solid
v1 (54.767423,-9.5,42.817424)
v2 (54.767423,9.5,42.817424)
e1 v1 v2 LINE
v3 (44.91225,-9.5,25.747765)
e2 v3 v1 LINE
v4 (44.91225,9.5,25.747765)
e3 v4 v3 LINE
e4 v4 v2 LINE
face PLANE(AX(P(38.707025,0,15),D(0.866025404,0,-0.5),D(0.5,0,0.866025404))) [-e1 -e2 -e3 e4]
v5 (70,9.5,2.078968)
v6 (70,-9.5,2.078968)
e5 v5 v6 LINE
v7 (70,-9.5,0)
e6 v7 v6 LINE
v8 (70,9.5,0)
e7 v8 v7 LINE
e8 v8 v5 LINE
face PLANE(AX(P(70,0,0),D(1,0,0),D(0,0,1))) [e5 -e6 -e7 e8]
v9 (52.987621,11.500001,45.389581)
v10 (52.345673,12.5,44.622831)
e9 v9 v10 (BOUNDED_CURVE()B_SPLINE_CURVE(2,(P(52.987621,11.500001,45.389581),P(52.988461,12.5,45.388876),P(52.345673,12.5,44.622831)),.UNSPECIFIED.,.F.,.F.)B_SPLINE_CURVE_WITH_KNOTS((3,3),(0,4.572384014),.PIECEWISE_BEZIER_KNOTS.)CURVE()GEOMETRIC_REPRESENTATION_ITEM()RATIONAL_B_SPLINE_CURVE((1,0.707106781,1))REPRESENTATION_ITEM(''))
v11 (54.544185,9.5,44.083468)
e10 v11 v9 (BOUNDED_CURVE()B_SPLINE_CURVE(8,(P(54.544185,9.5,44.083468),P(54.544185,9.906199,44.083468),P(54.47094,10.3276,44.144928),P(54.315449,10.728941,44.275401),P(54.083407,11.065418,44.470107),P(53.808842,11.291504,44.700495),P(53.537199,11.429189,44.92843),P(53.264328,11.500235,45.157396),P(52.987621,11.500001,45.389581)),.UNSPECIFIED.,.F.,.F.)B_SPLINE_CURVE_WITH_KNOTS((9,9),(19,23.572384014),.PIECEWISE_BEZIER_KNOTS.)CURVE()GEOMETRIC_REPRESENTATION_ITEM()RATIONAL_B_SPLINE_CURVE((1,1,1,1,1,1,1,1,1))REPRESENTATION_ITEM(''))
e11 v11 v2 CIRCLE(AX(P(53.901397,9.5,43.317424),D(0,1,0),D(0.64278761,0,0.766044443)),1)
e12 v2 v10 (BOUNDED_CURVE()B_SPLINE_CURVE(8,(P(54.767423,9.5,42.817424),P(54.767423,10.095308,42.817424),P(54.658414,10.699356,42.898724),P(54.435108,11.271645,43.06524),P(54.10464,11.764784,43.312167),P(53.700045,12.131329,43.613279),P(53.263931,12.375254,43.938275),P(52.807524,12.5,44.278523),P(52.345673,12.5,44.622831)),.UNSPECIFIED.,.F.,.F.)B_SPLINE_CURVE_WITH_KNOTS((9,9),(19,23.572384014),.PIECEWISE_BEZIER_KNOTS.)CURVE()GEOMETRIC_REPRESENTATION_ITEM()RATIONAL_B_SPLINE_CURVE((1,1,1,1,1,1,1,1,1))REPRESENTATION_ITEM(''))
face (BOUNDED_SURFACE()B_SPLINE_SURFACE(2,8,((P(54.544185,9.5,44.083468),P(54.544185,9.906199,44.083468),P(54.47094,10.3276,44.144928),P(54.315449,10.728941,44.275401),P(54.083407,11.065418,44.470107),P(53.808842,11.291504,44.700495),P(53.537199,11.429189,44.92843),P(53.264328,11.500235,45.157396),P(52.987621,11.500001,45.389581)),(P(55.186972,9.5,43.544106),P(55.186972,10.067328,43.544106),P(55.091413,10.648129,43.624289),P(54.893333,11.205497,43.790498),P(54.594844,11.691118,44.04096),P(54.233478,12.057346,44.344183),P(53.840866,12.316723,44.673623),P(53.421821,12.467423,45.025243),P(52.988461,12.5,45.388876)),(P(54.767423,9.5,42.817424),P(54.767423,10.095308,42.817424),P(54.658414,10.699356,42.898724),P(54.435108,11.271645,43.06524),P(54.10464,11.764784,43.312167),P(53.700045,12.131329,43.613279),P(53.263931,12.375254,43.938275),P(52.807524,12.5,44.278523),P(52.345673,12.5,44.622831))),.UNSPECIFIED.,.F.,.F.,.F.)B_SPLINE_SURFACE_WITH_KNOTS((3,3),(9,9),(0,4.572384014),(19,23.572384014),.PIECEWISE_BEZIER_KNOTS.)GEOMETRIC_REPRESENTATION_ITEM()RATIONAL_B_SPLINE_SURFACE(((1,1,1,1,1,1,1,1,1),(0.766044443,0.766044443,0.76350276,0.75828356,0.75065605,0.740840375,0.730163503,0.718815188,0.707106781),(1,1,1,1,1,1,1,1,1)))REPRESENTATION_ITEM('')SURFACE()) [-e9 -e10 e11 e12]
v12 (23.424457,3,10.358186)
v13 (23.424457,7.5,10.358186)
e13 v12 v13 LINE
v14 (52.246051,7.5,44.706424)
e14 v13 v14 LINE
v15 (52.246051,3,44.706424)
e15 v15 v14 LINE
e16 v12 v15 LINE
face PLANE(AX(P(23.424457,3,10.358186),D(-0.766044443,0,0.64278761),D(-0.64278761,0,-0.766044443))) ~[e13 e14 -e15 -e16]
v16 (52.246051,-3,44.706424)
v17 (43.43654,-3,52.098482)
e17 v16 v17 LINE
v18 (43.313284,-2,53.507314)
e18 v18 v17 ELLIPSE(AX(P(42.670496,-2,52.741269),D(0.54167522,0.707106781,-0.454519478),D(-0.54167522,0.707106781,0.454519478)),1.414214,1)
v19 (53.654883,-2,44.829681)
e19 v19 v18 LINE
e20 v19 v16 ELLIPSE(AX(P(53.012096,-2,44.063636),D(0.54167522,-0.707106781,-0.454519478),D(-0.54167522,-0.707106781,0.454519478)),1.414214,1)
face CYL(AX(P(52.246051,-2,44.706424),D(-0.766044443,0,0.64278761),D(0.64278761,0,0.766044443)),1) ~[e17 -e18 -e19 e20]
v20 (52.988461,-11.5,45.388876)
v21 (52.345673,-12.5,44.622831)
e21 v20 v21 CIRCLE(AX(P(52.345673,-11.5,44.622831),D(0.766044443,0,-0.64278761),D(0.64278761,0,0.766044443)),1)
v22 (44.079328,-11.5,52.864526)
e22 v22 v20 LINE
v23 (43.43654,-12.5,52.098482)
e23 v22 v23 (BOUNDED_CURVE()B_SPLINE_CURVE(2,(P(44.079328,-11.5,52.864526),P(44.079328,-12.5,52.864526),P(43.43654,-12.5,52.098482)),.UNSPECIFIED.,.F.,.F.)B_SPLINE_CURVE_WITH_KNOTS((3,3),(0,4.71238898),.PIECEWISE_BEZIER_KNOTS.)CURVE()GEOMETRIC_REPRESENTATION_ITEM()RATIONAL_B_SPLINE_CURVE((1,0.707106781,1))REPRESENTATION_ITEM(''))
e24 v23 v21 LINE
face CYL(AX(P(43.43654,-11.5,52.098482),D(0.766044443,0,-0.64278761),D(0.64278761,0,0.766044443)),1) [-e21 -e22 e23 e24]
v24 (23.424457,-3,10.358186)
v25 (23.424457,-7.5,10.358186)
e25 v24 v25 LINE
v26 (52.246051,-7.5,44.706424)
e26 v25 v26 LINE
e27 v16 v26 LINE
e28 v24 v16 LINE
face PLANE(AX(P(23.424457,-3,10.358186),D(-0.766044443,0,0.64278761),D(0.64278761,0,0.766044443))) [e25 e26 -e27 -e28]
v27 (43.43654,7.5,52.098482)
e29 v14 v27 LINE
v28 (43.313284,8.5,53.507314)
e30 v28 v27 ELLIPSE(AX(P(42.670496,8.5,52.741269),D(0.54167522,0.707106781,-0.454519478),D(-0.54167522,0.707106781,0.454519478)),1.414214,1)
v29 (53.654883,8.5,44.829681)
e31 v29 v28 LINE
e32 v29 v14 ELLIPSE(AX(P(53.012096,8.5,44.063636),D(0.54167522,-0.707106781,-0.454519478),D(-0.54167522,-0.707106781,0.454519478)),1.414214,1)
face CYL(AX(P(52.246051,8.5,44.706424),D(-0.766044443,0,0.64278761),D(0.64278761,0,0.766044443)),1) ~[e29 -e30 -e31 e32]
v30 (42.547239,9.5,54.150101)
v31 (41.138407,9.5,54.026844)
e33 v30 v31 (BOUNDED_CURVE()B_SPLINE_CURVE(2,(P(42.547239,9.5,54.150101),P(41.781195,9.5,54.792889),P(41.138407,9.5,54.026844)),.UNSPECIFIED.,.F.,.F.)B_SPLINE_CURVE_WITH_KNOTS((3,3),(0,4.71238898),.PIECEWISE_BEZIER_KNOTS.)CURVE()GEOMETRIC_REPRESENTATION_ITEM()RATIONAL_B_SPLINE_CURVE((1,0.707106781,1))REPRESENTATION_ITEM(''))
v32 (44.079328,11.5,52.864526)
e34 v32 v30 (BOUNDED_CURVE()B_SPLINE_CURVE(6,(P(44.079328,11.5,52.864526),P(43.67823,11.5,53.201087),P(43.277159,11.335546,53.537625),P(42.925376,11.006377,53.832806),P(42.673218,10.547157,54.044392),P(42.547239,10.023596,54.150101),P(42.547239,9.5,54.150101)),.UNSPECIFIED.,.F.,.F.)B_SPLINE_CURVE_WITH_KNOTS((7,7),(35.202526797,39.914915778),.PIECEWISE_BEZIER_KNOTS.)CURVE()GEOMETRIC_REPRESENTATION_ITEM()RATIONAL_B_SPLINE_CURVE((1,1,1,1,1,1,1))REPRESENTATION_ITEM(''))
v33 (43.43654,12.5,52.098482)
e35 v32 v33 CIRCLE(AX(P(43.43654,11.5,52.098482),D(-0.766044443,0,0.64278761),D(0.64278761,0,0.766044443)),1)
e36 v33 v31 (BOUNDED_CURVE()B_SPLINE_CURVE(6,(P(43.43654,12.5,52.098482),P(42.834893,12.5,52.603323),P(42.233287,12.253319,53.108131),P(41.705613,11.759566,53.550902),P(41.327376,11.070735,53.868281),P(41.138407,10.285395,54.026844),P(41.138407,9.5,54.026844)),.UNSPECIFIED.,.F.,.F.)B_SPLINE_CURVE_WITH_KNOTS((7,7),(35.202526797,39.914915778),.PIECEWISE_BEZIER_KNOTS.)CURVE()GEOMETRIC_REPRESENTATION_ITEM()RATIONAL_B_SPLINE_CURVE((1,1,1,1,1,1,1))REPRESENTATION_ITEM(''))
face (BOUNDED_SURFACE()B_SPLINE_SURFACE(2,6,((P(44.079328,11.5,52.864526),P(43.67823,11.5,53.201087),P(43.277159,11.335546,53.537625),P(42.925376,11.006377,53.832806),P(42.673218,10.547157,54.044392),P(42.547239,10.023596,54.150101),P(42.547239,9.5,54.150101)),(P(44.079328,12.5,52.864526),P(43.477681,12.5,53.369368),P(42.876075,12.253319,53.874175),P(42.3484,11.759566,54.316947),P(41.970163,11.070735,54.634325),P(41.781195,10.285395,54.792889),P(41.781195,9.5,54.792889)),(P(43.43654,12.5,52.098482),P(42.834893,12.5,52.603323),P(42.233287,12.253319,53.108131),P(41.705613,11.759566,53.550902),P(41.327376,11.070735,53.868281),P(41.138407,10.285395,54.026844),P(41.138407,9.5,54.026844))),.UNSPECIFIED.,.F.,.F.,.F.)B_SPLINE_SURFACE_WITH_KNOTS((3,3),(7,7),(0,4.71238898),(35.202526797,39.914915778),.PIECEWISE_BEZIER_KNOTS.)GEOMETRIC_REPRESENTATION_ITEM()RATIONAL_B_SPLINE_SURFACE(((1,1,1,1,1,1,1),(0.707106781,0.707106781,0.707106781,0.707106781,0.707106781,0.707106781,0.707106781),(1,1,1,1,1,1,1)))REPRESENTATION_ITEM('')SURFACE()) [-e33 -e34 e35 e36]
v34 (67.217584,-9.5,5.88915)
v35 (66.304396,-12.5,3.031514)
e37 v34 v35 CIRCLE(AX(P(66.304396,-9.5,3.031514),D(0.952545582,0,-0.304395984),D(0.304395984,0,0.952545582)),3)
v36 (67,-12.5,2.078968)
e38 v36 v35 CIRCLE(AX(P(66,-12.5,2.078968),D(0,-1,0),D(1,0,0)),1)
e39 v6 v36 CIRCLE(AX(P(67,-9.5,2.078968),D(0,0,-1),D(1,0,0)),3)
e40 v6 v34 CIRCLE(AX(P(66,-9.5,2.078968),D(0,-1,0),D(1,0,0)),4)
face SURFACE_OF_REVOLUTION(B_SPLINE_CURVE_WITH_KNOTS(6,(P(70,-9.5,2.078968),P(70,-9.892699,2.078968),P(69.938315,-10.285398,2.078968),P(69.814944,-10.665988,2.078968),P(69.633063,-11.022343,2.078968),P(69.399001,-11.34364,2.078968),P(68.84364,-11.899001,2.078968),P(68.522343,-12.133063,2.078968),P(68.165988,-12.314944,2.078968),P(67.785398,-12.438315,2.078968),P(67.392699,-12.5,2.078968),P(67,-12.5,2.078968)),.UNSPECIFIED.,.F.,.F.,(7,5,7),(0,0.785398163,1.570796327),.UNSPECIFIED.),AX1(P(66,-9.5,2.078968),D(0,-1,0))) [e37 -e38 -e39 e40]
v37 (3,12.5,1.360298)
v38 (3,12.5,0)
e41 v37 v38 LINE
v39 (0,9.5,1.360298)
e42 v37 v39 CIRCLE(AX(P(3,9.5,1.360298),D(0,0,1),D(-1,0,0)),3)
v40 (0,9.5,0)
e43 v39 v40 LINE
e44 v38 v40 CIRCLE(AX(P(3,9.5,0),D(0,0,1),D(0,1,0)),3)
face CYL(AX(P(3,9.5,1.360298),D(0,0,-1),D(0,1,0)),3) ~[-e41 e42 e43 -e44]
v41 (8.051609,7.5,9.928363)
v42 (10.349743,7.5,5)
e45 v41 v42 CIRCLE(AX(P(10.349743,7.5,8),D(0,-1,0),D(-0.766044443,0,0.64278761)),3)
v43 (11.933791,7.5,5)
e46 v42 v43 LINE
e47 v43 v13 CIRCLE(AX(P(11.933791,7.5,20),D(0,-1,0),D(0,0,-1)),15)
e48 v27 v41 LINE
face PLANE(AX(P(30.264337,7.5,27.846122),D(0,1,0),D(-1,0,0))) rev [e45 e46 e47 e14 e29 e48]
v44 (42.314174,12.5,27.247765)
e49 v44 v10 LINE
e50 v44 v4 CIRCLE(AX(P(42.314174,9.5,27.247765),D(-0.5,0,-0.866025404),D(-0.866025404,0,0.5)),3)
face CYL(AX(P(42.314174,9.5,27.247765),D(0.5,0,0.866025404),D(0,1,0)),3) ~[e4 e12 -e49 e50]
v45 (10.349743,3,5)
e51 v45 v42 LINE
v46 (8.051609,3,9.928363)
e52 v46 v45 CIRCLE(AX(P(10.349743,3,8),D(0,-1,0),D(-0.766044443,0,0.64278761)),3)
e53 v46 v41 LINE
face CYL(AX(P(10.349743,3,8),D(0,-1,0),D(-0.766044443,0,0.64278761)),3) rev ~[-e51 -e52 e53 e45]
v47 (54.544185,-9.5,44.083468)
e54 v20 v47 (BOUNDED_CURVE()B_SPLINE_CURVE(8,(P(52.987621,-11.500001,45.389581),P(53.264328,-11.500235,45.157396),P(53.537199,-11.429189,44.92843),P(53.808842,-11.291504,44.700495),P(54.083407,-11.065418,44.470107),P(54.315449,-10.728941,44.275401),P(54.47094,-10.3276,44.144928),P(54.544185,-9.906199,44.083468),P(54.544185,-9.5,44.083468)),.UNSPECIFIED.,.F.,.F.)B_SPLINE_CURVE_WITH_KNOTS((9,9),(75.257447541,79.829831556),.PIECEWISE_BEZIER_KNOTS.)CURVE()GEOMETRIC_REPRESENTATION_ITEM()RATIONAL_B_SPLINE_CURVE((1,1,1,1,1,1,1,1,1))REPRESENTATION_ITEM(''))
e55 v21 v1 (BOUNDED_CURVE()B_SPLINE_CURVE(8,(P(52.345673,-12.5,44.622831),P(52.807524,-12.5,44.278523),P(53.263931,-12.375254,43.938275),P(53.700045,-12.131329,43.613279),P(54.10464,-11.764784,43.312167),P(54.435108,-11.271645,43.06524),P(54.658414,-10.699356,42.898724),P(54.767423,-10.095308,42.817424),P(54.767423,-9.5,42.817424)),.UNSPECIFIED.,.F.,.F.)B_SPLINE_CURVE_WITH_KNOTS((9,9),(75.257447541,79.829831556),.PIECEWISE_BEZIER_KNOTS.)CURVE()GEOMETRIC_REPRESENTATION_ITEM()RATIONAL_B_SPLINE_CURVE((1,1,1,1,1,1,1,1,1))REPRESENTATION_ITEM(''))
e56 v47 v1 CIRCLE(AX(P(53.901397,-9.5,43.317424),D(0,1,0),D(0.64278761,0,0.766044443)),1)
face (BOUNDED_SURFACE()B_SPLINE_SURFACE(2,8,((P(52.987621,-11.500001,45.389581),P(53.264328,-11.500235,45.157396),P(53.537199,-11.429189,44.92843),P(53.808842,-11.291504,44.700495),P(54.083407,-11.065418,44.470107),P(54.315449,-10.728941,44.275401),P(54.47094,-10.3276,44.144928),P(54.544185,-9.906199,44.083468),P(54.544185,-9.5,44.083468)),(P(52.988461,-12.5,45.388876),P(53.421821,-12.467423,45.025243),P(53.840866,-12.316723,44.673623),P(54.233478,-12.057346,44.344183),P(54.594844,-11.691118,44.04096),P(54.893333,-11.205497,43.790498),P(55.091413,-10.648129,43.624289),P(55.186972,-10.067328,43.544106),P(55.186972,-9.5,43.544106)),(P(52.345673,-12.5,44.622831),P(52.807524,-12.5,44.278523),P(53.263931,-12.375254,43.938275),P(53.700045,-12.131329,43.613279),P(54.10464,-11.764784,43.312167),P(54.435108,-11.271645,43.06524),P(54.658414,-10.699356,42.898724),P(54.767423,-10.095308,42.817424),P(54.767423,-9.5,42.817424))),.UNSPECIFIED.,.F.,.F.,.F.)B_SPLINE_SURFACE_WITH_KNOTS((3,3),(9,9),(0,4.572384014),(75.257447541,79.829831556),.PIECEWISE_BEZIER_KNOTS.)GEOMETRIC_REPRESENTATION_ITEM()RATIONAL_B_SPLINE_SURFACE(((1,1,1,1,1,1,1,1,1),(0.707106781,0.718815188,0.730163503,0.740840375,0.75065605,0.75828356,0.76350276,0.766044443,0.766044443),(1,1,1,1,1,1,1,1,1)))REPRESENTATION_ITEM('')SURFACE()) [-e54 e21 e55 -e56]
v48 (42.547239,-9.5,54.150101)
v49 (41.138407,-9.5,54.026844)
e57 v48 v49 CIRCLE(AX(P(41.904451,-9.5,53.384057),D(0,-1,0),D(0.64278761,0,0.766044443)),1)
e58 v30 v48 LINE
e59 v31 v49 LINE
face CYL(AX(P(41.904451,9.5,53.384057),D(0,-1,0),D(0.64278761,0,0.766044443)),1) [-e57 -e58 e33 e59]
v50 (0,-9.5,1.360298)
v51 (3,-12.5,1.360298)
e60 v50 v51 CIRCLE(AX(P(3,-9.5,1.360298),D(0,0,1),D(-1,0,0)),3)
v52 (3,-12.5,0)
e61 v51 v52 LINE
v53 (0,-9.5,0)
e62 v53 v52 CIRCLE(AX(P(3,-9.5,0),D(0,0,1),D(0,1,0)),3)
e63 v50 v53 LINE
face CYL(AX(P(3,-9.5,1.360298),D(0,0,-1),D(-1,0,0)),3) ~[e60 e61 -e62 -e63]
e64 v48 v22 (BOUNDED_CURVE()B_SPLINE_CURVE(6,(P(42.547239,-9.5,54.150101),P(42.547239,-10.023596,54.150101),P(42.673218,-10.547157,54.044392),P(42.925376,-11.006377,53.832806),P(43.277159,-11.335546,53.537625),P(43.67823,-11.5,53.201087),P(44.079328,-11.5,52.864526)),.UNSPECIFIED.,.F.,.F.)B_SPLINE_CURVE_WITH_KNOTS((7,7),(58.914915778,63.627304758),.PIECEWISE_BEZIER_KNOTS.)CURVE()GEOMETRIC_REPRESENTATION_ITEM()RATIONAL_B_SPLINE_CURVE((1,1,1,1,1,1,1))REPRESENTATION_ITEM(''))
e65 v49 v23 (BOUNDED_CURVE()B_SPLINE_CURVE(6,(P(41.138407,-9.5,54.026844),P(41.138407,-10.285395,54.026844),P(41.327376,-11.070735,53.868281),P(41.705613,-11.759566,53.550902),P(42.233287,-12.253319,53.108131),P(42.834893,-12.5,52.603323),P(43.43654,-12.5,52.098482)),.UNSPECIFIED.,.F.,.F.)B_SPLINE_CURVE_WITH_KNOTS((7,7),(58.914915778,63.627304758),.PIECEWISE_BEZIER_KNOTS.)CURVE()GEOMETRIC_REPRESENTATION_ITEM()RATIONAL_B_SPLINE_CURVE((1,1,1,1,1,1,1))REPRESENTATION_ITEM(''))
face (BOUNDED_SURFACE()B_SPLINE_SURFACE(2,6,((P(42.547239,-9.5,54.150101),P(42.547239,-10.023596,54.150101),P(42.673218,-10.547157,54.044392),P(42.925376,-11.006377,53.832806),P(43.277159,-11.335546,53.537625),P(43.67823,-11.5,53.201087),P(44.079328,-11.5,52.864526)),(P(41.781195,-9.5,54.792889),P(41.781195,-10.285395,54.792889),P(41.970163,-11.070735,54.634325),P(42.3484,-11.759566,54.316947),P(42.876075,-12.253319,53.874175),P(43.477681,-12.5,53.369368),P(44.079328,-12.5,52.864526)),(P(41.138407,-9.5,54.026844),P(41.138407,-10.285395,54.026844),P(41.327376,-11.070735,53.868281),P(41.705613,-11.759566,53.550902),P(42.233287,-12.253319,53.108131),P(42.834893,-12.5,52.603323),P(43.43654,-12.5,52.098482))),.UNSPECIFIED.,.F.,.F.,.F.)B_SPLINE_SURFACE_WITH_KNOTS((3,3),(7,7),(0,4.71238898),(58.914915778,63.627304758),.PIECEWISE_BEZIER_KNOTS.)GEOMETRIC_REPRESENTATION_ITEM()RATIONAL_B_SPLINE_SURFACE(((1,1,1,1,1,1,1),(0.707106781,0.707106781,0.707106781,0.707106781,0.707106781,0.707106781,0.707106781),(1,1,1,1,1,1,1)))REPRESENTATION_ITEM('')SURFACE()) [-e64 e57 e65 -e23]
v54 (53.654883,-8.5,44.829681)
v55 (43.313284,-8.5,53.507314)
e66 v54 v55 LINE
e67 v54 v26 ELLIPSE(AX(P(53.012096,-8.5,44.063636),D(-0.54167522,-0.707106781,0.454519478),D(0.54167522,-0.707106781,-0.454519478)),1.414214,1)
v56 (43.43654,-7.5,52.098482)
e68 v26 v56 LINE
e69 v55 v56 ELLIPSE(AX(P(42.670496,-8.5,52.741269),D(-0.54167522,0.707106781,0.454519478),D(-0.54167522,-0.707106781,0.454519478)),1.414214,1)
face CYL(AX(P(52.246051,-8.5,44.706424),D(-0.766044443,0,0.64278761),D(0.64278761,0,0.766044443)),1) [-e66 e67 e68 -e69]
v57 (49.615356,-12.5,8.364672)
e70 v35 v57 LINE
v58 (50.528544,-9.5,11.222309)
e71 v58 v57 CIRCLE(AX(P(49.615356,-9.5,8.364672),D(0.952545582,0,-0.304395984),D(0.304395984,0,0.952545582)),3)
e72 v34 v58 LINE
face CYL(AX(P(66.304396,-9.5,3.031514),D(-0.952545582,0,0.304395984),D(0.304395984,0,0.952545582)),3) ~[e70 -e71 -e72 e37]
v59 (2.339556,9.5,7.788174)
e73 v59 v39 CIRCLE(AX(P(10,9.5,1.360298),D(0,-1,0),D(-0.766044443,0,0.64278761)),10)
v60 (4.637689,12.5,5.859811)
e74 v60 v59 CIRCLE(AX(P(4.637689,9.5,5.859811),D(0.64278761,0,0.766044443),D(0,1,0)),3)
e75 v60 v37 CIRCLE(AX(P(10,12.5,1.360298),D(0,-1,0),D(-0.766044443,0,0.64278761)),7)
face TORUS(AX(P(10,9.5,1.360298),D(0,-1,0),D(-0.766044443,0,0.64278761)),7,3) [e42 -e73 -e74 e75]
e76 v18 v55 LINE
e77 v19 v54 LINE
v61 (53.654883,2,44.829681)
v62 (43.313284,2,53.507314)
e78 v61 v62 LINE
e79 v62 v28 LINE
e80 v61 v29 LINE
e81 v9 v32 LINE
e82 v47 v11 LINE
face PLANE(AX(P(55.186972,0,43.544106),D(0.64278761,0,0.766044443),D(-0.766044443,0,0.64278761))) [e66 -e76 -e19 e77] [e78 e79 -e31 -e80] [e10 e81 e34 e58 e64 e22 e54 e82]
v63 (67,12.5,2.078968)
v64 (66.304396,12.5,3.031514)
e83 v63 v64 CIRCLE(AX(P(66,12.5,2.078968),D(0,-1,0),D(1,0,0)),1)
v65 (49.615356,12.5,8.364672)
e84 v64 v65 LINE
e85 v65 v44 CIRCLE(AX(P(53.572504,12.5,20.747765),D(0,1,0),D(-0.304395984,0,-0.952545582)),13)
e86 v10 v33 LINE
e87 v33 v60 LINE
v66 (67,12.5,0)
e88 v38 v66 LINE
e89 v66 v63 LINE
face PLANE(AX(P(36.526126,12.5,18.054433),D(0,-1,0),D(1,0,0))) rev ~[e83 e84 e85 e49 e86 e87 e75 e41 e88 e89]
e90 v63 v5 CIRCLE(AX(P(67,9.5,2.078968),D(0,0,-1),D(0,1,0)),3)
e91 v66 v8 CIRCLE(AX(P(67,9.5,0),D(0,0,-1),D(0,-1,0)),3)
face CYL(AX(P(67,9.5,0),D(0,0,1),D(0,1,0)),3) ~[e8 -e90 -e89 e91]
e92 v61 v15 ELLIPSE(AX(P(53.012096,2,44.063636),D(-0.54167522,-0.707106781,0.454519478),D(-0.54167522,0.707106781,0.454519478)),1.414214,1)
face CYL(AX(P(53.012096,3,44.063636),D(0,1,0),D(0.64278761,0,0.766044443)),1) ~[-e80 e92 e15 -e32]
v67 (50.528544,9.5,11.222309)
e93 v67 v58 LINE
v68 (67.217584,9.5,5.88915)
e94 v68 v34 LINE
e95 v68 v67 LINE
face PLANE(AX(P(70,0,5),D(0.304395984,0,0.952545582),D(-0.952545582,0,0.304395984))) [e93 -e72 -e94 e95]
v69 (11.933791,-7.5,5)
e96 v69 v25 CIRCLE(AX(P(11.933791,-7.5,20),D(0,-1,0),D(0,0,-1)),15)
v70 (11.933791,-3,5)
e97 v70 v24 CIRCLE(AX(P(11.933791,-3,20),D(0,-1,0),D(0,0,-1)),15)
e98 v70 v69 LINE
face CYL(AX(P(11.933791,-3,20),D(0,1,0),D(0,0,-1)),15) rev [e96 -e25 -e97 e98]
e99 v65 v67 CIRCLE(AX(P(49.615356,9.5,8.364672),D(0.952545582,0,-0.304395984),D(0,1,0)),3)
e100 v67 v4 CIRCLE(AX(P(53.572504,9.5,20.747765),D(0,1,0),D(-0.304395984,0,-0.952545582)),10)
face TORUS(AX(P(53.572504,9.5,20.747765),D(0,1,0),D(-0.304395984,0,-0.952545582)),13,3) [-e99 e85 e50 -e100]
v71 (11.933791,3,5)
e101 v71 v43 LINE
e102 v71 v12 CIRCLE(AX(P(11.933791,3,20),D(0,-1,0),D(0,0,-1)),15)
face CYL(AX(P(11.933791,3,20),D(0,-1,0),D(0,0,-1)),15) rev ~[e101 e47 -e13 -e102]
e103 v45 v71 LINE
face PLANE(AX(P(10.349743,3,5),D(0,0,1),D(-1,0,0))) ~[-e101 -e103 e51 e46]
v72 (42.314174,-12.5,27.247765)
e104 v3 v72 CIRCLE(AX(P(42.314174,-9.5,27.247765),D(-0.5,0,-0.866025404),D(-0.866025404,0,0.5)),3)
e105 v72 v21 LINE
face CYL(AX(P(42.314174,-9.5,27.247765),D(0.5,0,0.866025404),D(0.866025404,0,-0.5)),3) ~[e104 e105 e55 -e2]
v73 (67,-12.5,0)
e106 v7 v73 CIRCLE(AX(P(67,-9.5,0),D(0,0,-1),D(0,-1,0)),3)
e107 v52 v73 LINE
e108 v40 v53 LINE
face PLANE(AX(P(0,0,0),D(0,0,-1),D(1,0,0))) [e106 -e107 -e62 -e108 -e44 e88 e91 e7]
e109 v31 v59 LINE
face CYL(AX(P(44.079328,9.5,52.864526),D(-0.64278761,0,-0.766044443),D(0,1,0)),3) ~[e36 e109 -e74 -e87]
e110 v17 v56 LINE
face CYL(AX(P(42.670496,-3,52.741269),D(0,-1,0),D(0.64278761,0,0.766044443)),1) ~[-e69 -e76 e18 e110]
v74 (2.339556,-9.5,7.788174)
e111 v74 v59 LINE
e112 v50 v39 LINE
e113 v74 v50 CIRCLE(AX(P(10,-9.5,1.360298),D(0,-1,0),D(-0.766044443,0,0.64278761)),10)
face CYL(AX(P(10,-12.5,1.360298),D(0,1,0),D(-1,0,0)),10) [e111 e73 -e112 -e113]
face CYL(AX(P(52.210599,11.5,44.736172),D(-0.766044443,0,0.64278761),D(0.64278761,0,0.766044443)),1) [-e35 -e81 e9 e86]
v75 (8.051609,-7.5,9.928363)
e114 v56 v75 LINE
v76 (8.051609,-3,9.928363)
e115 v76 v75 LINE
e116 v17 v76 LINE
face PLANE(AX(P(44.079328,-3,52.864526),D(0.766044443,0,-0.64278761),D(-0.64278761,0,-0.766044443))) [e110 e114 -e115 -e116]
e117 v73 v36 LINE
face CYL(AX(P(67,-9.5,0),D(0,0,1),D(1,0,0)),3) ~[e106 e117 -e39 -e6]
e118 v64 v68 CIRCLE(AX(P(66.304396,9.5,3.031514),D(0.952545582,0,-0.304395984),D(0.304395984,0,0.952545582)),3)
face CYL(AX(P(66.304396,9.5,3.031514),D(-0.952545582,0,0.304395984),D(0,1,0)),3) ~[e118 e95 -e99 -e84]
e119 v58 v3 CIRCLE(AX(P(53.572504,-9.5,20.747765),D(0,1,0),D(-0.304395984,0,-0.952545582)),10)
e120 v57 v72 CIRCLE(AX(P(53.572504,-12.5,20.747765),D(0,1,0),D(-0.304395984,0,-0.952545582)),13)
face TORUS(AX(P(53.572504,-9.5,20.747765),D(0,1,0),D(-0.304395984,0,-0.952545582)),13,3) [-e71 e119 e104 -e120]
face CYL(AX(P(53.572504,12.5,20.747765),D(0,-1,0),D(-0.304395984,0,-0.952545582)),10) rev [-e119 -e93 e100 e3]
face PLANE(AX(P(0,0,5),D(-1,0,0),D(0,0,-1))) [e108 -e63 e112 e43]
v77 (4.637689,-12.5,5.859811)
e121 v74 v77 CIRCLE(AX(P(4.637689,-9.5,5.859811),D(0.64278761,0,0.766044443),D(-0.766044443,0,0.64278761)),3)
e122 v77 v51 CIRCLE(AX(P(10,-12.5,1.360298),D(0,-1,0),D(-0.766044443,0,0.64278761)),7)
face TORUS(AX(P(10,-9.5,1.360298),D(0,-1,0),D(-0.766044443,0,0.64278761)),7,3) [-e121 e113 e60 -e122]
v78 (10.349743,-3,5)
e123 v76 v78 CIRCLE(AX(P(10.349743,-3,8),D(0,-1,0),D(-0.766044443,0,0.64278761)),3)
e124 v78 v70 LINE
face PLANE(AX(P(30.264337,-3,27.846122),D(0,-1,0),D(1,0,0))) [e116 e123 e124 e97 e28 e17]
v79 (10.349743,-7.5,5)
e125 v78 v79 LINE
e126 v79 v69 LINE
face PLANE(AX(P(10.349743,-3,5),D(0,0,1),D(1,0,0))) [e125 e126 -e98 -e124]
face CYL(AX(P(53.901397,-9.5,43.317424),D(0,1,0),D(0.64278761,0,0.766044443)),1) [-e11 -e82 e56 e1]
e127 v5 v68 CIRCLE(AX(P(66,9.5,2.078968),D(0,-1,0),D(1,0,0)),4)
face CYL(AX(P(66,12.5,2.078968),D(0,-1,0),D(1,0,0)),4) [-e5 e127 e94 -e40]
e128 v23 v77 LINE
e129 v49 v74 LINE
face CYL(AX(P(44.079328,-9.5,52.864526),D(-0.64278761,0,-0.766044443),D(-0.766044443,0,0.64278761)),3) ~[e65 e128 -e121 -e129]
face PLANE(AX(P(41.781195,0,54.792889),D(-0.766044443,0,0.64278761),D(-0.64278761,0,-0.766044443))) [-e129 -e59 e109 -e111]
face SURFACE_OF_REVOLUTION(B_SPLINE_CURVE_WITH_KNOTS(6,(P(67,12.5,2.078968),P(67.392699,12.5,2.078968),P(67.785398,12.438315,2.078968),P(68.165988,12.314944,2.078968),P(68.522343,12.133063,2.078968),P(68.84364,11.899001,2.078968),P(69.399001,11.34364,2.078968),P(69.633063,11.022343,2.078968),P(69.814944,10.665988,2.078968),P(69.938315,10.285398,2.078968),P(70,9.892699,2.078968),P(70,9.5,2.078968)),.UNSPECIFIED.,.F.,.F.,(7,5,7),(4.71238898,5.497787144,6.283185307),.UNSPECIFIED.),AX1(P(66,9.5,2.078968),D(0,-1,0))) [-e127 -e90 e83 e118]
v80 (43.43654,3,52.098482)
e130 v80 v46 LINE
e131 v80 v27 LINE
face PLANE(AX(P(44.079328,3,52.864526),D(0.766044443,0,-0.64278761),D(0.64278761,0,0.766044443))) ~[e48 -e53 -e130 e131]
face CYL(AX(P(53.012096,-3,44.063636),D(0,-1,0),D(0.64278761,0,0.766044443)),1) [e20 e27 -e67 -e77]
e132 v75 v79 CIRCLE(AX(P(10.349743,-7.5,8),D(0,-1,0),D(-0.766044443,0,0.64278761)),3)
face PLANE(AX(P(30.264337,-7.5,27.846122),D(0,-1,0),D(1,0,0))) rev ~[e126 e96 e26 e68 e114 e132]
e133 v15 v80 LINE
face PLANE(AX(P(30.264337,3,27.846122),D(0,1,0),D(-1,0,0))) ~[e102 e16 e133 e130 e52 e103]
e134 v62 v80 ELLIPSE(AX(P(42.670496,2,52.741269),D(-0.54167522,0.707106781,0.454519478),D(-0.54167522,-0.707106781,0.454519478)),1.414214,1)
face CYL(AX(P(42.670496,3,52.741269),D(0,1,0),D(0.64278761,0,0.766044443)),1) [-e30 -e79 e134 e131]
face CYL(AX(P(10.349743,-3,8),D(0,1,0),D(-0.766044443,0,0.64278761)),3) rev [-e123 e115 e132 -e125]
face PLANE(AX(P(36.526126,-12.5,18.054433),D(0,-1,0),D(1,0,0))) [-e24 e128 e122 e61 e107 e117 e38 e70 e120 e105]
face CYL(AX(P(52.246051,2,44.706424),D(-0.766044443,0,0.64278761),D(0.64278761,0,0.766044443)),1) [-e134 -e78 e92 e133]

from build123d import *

# Parameters (mm, degrees)
F1_DEPTH      = 12.5
F1_DEPTH_BACK = 12.5
F4_DEPTH      = 4.5
F5_R          = 10
F6_R          = 4
F7_R          = 3
F8_R          = 1


# Not quite as in the source:
# - a pattern or mirror of a feature is missing from the dataset's text; its kind, count and spacing are read off the source's solid


with BuildPart() as f1:
    # F0 (on Front) → F1 (new body, two sides)
    with BuildSketch(Plane.XZ) as f1_sk:
        Polygon((0, 5), (0, 0), (70, 0), (70, 5), (38.7070253131, 15), (55.1869723842, 43.5441056332), (41.7811946296, 54.7928888027), align=None)
    extrude(amount=F1_DEPTH)
    extrude(f1_sk.sketch, amount=-F1_DEPTH_BACK)

    # F3 (on offset) → F4 (cut)
    with BuildSketch(Plane.XZ.offset(3)):
        with BuildLine():
            Line((52.8888390549, 45.4724684623), (44.079327959, 52.8645259737))
            Line((44.079327959, 52.8645259737), (8.0516093002, 9.9283628291))
            ThreePointArc((8.0516093002, 9.9283628291), (7.6308192684, 6.7321452148), (10.3497426295, 5))
            Line((10.3497426295, 5), (11.933790823, 5))
            ThreePointArc((11.933790823, 5), (18.2730647491, 6.4053831945), (23.4244574698, 10.3581858547))
            Line((23.4244574698, 10.3581858547), (52.8888390549, 45.4724684623))
        make_face()
    f4 = extrude(amount=F4_DEPTH, mode=Mode.SUBTRACT)

    # F4_copies: F4 across plane
    add(f4.mirror(Plane.ZX), mode=Mode.SUBTRACT)

    # F5
    f5_edges = [f1.edges().sort_by_distance(p)[0] for p in [
        (38.707025, 0, 15),
        (0, 0, 5),
    ]]
    fillet(f5_edges, radius=F5_R)

    # F6
    f6_edges = [f1.edges().sort_by_distance(p)[0] for p in [
        (70, 0, 5),
    ]]
    fillet(f6_edges, radius=F6_R)

    # F7
    f7_edges = [f1.edges().sort_by_distance(p)[0] for p in [
        (22.060375, -12.5, 31.290531),
        (50.049611, -12.5, 34.645935),
        (50.049611, 12.5, 34.645935),
        (22.060375, 12.5, 31.290531),
        (70, -12.5, 1.039484),
        (69.230351, -12.5, 4.437958),
        (58.873064, -12.5, 8.55573),
        (0, -12.5, 0.680149),
        (44.245427, -12.5, 17.141433),
        (0.603074, -12.5, 4.780499),
        (70, 12.5, 1.039484),
        (69.230351, 12.5, 4.437958),
        (58.873064, 12.5, 8.55573),
        (0, 12.5, 0.680149),
        (44.245427, 12.5, 17.141433),
        (0.603074, 12.5, 4.780499),
    ]]
    fillet(f7_edges, radius=F7_R)

    # F8
    f8_edges = [f1.edges().sort_by_distance(p)[0] for p in [
        (55.186972, 0, 43.544106),
        (54.497154, -11.629423, 44.122932),
        (54.497154, 11.629423, 44.122932),
        (48.466357, -12.5, 49.183371),
        (48.466357, 12.5, 49.183371),
        (42.454302, -11.62132, 54.228084),
        (42.454302, 11.62132, 54.228084),
        (41.781195, 0, 54.792889),
        (52.888839, -5.25, 45.472468),
        (48.484084, -3, 49.168497),
        (48.484084, -7.5, 49.168497),
        (44.079328, -5.25, 52.864526),
        (48.484084, 3, 49.168497),
        (44.079328, 5.25, 52.864526),
        (48.484084, 7.5, 49.168497),
        (52.888839, 5.25, 45.472468),
    ]]
    fillet(f8_edges, radius=F8_R)


solid = f1.part
